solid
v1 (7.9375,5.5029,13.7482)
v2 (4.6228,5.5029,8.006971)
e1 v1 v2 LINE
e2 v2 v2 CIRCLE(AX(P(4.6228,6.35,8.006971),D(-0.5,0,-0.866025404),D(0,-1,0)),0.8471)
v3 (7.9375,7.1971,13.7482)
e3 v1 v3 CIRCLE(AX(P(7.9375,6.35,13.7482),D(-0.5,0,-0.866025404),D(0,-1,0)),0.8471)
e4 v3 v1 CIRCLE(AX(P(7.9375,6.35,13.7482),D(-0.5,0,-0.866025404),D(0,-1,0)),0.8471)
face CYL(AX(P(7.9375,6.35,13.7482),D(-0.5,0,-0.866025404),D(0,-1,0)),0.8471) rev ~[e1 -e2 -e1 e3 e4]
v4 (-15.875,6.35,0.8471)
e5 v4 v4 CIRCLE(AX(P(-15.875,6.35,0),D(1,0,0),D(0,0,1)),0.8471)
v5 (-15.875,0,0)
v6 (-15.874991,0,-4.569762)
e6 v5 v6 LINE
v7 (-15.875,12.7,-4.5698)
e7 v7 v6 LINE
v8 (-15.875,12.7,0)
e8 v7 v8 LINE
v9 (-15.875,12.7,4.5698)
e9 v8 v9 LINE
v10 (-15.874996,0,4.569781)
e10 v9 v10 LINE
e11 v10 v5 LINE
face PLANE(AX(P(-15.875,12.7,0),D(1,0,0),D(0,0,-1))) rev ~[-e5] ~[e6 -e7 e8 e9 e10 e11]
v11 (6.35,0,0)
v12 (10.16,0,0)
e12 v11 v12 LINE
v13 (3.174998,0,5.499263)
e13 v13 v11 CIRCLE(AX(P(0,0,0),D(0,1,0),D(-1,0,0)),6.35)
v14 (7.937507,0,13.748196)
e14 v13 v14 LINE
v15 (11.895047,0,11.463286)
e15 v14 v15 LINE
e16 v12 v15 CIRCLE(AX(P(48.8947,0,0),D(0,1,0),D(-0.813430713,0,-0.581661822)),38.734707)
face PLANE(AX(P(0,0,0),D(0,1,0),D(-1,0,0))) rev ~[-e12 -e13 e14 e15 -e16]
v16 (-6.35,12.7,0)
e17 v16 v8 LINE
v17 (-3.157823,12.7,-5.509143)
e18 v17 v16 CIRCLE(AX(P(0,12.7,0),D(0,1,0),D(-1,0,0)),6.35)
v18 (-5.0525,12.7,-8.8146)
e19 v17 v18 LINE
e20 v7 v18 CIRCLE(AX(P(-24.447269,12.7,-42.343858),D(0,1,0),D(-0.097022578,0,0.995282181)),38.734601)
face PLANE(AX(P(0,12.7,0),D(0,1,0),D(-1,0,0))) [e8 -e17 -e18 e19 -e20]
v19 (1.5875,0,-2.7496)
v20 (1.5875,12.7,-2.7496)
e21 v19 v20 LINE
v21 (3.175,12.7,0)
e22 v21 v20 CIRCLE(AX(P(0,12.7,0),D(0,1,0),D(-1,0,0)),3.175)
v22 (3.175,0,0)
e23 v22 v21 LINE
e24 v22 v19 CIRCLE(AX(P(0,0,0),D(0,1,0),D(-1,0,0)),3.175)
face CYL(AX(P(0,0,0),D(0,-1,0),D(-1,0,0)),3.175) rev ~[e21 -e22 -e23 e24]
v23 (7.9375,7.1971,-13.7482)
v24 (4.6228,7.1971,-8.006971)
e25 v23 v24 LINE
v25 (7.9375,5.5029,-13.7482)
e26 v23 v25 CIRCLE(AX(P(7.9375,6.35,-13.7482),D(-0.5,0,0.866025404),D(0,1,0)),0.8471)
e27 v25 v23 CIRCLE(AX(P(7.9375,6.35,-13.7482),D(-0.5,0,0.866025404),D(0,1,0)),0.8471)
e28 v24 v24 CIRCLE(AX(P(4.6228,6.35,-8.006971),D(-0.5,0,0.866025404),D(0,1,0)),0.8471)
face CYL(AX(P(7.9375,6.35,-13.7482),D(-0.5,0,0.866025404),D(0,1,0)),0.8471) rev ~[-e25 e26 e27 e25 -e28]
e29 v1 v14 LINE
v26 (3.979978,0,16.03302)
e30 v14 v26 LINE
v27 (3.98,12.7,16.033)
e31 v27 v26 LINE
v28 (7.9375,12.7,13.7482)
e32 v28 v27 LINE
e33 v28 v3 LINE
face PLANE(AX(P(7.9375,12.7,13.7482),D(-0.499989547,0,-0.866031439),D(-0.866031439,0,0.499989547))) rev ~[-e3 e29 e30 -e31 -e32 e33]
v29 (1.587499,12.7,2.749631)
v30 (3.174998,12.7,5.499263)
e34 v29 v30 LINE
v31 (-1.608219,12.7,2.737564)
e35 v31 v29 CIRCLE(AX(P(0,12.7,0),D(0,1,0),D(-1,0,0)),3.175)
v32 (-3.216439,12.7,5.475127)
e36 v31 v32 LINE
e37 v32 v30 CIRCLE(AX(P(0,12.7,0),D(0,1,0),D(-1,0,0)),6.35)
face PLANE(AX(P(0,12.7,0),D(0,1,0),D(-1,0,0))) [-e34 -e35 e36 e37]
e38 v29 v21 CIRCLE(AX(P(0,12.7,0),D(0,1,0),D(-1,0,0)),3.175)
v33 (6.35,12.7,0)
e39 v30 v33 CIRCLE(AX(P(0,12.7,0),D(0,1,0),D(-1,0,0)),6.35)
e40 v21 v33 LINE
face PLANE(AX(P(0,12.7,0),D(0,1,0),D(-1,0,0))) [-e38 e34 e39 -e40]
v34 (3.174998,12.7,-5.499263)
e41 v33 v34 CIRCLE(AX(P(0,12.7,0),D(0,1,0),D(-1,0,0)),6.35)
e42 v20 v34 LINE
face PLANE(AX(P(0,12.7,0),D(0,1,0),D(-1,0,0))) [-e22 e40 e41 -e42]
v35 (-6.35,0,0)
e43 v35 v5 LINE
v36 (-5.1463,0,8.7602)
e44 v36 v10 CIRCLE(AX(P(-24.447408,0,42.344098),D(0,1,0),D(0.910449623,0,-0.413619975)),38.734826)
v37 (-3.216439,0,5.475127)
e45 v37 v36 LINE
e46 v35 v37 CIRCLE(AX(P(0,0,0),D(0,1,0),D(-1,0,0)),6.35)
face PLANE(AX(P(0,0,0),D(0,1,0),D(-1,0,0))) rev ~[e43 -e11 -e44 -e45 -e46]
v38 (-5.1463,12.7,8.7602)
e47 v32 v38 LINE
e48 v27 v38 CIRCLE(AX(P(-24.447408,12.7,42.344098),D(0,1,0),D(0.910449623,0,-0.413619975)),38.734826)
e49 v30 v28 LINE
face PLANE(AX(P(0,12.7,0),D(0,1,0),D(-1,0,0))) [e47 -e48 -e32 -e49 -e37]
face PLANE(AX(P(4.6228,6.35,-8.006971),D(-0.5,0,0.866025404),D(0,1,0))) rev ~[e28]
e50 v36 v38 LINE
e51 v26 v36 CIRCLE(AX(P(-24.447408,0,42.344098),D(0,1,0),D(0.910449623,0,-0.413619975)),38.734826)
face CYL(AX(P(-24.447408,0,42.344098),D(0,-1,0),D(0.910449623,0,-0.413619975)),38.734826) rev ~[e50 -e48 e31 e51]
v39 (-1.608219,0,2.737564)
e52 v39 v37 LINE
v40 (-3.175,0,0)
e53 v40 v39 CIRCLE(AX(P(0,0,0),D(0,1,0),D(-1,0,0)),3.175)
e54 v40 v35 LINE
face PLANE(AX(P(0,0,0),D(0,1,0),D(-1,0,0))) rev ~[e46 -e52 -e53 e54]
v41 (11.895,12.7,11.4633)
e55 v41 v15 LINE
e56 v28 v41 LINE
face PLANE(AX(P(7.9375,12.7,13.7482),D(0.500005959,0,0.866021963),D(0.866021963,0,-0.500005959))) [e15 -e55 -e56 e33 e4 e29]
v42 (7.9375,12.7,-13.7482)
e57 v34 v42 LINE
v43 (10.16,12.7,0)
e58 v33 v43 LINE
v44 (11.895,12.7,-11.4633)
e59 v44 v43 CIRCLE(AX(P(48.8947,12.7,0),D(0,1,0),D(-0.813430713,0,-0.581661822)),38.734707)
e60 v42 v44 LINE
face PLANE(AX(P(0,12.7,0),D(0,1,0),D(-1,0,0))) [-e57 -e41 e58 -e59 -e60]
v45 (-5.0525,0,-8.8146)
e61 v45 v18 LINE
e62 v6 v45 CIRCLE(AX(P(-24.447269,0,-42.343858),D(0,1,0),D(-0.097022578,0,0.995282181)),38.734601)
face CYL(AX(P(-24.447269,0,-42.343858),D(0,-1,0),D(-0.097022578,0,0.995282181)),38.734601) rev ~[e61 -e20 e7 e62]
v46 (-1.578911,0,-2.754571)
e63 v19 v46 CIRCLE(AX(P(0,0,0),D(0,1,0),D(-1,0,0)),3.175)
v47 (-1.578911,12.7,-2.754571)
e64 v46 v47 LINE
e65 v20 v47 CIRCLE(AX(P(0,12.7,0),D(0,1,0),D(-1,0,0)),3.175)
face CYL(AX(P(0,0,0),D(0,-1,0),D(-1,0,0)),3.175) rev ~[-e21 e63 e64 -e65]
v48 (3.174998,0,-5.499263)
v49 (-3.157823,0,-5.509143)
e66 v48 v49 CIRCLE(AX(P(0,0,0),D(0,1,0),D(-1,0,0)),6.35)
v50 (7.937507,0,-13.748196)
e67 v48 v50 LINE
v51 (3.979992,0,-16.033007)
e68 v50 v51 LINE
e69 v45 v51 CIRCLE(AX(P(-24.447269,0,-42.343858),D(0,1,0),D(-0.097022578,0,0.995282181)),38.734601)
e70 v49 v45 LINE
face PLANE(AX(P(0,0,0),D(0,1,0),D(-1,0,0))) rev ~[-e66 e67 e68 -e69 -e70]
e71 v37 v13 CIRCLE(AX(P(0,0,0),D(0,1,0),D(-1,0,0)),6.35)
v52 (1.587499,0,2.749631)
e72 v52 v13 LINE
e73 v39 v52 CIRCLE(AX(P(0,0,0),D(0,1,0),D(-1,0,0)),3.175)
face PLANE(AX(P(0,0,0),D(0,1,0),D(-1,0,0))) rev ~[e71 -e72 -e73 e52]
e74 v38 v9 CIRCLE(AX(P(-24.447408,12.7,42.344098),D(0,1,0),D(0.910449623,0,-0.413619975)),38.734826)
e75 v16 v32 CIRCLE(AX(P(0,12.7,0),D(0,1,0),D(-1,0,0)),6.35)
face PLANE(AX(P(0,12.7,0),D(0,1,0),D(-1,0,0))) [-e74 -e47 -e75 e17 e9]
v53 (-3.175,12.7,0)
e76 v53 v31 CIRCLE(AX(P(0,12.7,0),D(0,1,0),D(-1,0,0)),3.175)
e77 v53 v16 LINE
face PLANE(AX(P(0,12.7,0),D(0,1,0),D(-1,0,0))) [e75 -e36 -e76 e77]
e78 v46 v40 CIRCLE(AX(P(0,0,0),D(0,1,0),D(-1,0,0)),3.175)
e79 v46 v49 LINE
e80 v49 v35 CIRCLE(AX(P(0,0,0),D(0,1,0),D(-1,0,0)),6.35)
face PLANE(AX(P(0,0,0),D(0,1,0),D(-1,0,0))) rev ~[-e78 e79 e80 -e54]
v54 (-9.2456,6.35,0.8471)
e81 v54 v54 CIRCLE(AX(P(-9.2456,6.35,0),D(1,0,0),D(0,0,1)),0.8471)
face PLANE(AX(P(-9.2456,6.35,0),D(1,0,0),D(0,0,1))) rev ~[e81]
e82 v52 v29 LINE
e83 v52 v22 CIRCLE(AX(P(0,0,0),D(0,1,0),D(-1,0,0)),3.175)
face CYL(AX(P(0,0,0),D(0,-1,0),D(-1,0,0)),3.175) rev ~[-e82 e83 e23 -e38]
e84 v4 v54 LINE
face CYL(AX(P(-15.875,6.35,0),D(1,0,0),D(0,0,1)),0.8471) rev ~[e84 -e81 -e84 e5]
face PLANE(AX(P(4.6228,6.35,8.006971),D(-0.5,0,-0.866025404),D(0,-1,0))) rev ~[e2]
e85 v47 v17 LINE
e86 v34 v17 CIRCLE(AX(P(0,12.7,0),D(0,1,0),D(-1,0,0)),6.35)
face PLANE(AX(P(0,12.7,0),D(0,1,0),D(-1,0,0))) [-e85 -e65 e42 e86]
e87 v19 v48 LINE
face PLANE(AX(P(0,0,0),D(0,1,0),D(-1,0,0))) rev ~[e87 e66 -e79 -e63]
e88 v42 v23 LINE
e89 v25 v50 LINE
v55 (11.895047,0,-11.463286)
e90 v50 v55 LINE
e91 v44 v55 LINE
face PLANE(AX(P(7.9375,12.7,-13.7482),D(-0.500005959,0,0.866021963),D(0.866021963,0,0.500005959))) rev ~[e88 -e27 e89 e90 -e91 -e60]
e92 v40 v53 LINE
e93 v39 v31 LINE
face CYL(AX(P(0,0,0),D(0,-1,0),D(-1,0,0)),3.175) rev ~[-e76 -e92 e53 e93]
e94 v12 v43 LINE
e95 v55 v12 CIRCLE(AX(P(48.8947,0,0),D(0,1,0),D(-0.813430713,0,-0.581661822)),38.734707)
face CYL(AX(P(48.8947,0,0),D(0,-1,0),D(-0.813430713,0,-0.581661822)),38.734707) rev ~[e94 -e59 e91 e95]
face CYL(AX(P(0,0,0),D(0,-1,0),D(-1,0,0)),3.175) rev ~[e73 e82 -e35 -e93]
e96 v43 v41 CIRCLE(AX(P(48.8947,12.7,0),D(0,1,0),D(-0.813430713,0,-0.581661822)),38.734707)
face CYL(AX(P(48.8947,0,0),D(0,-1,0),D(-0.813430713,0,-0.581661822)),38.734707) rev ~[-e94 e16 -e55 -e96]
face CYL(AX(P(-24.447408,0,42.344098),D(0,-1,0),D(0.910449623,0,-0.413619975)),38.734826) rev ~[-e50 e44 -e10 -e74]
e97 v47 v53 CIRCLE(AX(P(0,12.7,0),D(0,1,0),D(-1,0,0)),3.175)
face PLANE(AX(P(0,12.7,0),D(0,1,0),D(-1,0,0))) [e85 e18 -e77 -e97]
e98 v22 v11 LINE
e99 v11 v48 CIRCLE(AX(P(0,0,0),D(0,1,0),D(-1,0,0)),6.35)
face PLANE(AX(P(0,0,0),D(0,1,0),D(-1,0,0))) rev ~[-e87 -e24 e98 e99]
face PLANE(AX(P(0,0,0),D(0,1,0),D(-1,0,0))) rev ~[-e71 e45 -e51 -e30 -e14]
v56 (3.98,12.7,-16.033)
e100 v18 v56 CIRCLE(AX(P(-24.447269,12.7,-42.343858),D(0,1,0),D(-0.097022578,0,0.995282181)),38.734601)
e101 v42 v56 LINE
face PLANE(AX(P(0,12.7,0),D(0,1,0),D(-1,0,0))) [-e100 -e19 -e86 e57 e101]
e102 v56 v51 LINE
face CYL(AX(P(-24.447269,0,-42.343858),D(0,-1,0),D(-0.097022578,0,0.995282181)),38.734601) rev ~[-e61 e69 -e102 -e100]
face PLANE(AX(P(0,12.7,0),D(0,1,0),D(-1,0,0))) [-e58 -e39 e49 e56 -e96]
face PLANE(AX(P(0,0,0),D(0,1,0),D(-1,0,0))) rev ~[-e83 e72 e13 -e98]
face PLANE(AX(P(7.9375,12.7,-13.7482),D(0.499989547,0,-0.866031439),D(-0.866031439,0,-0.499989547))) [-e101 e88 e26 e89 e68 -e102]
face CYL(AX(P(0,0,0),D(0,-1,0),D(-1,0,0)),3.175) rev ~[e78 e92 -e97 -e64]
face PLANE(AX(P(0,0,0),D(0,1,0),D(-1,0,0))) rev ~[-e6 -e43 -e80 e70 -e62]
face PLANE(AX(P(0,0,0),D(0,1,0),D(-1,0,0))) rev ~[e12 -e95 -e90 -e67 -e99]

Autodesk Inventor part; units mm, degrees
ref_plane "YZ Plane" through (0, 0, 0) normal (1, 0, 0) x (0, 1, 0)
ref_plane "XZ Plane" through (0, 0, 0) normal (0, 1, 0) x (-1, 0, 0)
ref_plane "XY Plane" through (0, 0, 0) normal (0, 0, 1) x (1, 0, 0)
sketch "Sketch1" plane through (0, 0, 0) normal (0, 1, 0) x (-1, 0, 0)
  line L0 (0, 0) -> (28.575, 0)
  line L1 (28.575, 0) -> (0, 0)
  line L2 (0, 0) -> (-14.2875, -24.7467)
  line L3 (0, 0) -> (28.575, 0) construction
  line L4 (0, 0) -> (-14.2875, 24.7467)
  line L5 (0, 0) -> (28.575, 0) construction
  circle A0 centre (28.575, 0) radius 2.54
  circle A1 centre (-14.2875, -24.7467) radius 2.54
  circle A2 centre (-14.2875, 24.7467) radius 2.54
  circle A3 centre (0, 0) radius 3.175
  circle A4 centre (0, 0) radius 6.35
  line L6 (-1.5875, -2.7496) -> (0, 0)
  line L7 (0, 0) -> (-6.35, 0)
  circle A5 centre (-14.2875, 24.7467) radius 3.81
  circle A6 centre (28.575, 0) radius 3.81
  circle A7 centre (-14.2875, -24.7467) radius 3.81
  line L8 (30.6811, 3.175) -> (-12.1814, 27.9217)
  line L9 (28.2054, -3.792) -> (-10.8187, -26.3226)
  line L10 (-18.0975, 24.7467) -> (-18.0975, -24.7467)
  line L11 (0, 0) -> (5.0525, -8.8146)
  line L12 (0, 0) -> (5.1463, 8.7602)
  line L13 (0, 0) -> (-10.16, 0)
  arc A8 (28.2054, -3.792) -> (-10.8187, -26.3226) centre (24.4473, -42.344) ccw
  arc A9 (-10.8187, 26.3226) -> (28.2054, 3.792) centre (24.4473, 42.344) ccw
  arc A10 (-17.3867, -22.5305) -> (-17.3867, 22.5305) centre (-48.8947, 0) ccw
  point P0 (5.1074, 8.7829)
  point P1 (-10.16, 0.0317)
  point P2 (30.2716, 3.4114)
  point P3 (28.2054, 3.792)
  point P4 (-10.8187, 26.3226)
  point P5 (-17.3867, 22.5305)
  point P6 (-17.3867, -22.5305)
  dimension "d9" = 6.35
  dimension "d41" = 12.7
  dimension "d0" = 28.575
  dimension "d1" = 28.575
  dimension "d2" = 120
  dimension "d3" = 28.575
  dimension "d4" = 120
  dimension "d5" = 5.08
  dimension "d6" = 5.08
  dimension "d7" = 5.08
  dimension "d42" = 7.62
  dimension "d43" = 7.62
  dimension "d44" = 7.62
  dimension "d47" = 10.16
  dimension "d48" = 10.16
  dimension "d49" = 10.16
  dimension "d52" = 360
extrude "Extrusion4" add sketch "Sketch1" along normal blind 12.7 contours A3 L12 A4 L0 | L0 A4 L11 A3 | A3 L11 A4 L2 | L2 A4 L7 A3 | A3 L7 A4 L4 | L4 A4 L12 A3 | A4 L12 A9 A6 L0 | L0 A6 A8 L11 A4 | A4 L11 A8 A7 L2 | L2 A7 A10 L13 A4 | A4 L13 A10 A5 L4 | L4 A5 A9 L12 A4 | A6 L8 | A7 | A5 picked at (31.8987, 0.5122)
sketch "Sketch11" plane through (0, 12.7, 0) normal (0, 1, 0) x (1, 0, 0)
  arc A0 (10.8187, -26.3226) -> (-28.2054, -3.792) centre (-24.4473, -42.344) ccw projected
  arc A1 (17.3867, 22.5305) -> (17.3867, -22.5305) centre (48.8947, 0) ccw projected
  arc A2 (10.8187, -26.3226) -> (17.3867, -22.5305) centre (14.2875, -24.7467) ccw projected
  line L0 (0, 0) -> (14.2875, -24.7467)
  circle A3 centre (14.2875, -24.7467) radius 2.54 projected
  line L1 (14.2875, -24.7467) -> (8.2579, -14.3032)
  line L2 (14.2875, -24.7467) -> (7.9375, -13.7482)
  line L3 (7.9375, -13.7482) -> (11.895, -11.4633)
  line L4 (7.9375, -13.7482) -> (3.98, -16.033)
  circle A4 centre (14.2875, 24.7467) radius 2.54 projected
  line L5 (0, 0) -> (14.2875, 24.7467)
  line L6 (14.2875, 24.7467) -> (7.9375, 13.7482)
  line L7 (7.9375, 13.7482) -> (0, 0)
  circle A5 centre (-28.575, 0) radius 2.54 projected
  line L8 (0, 0) -> (-28.575, 0)
  line L9 (-28.575, 0) -> (-15.875, 0)
  line L10 (-15.875, 0) -> (-15.875, 4.5698)
  arc A6 (-28.2054, 3.792) -> (10.8187, 26.3226) centre (-24.4473, 42.344) ccw projected
  line L11 (-15.875, 0) -> (-15.875, -4.5698)
  line L12 (7.9375, 13.7482) -> (3.98, 16.033)
  line L13 (7.9375, 13.7482) -> (11.895, 11.4633)
  arc A7 (17.3867, 22.5305) -> (17.3867, -22.5305) centre (48.8947, 0) ccw projected
  arc A8 (-28.2054, 3.792) -> (-30.6811, -3.175) centre (-28.575, 0) ccw projected
  arc A9 (10.8187, -26.3226) -> (-28.2054, -3.792) centre (-24.4473, -42.344) ccw projected
  arc A10 (-30.2716, -3.4114) -> (-28.2054, -3.792) centre (-28.575, 0) ccw projected
  line L14 (-30.6811, -3.175) -> (-30.2716, -3.4114) projected
  arc A11 (17.3867, 22.5305) -> (10.8187, 26.3226) centre (14.2875, 24.7467) ccw projected
  point P0 (2.3124, -14.3387)
  point P1 (11.3663, -9.5918)
  point P2 (10.2682, -2.8934)
  point P3 (-3.012, -10.0809)
  dimension "d65" = 12.7
  dimension "d66" = 12.7
  dimension "d67" = 12.7
extrude "Extrusion6" cut sketch "Sketch11" against normal blind 25.4 contours A0 L4 L3 A1 A2 | A0 A10 L14 A8 A6 L10 L11 | L13 L12 A6 A11 A1
sketch "Sketch12" plane through (-15.875, 12.7, -4.5698) normal (-1, 0, 0) x (0, 0, 1)
  line L0 (0, -12.7) -> (0, 0) projected
  line L1 (0, -6.35) -> (9.0387, -6.35)
  line L2 (1.3948, 0) -> (7.7448, 0) projected
  line L3 (4.5698, 0) -> (4.5698, -12.7)
  line L4 (9.1395, -12.7) -> (20.6028, -12.7) projected
  line L5 (9.1395, 0) -> (20.6028, 0) projected
  line L6 (9.1395, -12.7) -> (9.1395, 0)
  line L7 (9.0387, -6.35) -> (9.1395, -6.35)
  line L8 (9.1395, 0) -> (9.1395, -12.7) projected
  point P0 (4.5698, -6.35)
sketch "Sketch13" plane through (11.895, 0, 11.4633) normal (0.5, 0, 0.8660254) x (0.8660254, 0, -0.5)
  line L0 (0, 12.7) -> (0, 0) projected
  line L1 (0, 6.35) -> (-9.1395, 6.35)
  line L2 (-9.1395, 0) -> (-9.1395, 12.7) projected
  line L3 (-9.1395, 12.7) -> (0, 12.7) projected
  line L4 (-4.5698, 12.7) -> (-4.5698, 0)
  point P0 (-4.5698, 6.35)
sketch "Sketch14" plane through (3.98, 0, -16.033) normal (0.5, 0, -0.8660254) x (-0.8660254, 0, -0.5)
  line L0 (-9.1395, 0) -> (-9.1395, 12.7) projected
  line L1 (-9.1395, 6.35) -> (0, 6.35)
  line L2 (0, 12.7) -> (0, 0) projected
  line L3 (-9.1395, 12.7) -> (0, 12.7) projected
  line L4 (-4.5698, 12.7) -> (-4.5698, 0)
  point P0 (-4.5698, 6.35)
hole "Hole5" at (7.9375, 6.35, 13.7482) direction (-0.5, 0, -0.8660254) diameter 1.6942 depth 6.6294 thread size "2-56 UNC" class "2B" standard "ANSI Unified Screw Threads"
hole "Hole6" at (-15.875, 6.35, 0) direction (1, 0, 0) diameter 1.6942 depth 6.6294 thread size "2-56 UNC" class "2B" standard "ANSI Unified Screw Threads"
hole "Hole7" at (7.9375, 6.35, -13.7482) direction (-0.5, 0, 0.8660254) diameter 1.6942 depth 6.6294 thread size "2-56 UNC" class "2B" standard "ANSI Unified Screw Threads"
properties part number "stability"
